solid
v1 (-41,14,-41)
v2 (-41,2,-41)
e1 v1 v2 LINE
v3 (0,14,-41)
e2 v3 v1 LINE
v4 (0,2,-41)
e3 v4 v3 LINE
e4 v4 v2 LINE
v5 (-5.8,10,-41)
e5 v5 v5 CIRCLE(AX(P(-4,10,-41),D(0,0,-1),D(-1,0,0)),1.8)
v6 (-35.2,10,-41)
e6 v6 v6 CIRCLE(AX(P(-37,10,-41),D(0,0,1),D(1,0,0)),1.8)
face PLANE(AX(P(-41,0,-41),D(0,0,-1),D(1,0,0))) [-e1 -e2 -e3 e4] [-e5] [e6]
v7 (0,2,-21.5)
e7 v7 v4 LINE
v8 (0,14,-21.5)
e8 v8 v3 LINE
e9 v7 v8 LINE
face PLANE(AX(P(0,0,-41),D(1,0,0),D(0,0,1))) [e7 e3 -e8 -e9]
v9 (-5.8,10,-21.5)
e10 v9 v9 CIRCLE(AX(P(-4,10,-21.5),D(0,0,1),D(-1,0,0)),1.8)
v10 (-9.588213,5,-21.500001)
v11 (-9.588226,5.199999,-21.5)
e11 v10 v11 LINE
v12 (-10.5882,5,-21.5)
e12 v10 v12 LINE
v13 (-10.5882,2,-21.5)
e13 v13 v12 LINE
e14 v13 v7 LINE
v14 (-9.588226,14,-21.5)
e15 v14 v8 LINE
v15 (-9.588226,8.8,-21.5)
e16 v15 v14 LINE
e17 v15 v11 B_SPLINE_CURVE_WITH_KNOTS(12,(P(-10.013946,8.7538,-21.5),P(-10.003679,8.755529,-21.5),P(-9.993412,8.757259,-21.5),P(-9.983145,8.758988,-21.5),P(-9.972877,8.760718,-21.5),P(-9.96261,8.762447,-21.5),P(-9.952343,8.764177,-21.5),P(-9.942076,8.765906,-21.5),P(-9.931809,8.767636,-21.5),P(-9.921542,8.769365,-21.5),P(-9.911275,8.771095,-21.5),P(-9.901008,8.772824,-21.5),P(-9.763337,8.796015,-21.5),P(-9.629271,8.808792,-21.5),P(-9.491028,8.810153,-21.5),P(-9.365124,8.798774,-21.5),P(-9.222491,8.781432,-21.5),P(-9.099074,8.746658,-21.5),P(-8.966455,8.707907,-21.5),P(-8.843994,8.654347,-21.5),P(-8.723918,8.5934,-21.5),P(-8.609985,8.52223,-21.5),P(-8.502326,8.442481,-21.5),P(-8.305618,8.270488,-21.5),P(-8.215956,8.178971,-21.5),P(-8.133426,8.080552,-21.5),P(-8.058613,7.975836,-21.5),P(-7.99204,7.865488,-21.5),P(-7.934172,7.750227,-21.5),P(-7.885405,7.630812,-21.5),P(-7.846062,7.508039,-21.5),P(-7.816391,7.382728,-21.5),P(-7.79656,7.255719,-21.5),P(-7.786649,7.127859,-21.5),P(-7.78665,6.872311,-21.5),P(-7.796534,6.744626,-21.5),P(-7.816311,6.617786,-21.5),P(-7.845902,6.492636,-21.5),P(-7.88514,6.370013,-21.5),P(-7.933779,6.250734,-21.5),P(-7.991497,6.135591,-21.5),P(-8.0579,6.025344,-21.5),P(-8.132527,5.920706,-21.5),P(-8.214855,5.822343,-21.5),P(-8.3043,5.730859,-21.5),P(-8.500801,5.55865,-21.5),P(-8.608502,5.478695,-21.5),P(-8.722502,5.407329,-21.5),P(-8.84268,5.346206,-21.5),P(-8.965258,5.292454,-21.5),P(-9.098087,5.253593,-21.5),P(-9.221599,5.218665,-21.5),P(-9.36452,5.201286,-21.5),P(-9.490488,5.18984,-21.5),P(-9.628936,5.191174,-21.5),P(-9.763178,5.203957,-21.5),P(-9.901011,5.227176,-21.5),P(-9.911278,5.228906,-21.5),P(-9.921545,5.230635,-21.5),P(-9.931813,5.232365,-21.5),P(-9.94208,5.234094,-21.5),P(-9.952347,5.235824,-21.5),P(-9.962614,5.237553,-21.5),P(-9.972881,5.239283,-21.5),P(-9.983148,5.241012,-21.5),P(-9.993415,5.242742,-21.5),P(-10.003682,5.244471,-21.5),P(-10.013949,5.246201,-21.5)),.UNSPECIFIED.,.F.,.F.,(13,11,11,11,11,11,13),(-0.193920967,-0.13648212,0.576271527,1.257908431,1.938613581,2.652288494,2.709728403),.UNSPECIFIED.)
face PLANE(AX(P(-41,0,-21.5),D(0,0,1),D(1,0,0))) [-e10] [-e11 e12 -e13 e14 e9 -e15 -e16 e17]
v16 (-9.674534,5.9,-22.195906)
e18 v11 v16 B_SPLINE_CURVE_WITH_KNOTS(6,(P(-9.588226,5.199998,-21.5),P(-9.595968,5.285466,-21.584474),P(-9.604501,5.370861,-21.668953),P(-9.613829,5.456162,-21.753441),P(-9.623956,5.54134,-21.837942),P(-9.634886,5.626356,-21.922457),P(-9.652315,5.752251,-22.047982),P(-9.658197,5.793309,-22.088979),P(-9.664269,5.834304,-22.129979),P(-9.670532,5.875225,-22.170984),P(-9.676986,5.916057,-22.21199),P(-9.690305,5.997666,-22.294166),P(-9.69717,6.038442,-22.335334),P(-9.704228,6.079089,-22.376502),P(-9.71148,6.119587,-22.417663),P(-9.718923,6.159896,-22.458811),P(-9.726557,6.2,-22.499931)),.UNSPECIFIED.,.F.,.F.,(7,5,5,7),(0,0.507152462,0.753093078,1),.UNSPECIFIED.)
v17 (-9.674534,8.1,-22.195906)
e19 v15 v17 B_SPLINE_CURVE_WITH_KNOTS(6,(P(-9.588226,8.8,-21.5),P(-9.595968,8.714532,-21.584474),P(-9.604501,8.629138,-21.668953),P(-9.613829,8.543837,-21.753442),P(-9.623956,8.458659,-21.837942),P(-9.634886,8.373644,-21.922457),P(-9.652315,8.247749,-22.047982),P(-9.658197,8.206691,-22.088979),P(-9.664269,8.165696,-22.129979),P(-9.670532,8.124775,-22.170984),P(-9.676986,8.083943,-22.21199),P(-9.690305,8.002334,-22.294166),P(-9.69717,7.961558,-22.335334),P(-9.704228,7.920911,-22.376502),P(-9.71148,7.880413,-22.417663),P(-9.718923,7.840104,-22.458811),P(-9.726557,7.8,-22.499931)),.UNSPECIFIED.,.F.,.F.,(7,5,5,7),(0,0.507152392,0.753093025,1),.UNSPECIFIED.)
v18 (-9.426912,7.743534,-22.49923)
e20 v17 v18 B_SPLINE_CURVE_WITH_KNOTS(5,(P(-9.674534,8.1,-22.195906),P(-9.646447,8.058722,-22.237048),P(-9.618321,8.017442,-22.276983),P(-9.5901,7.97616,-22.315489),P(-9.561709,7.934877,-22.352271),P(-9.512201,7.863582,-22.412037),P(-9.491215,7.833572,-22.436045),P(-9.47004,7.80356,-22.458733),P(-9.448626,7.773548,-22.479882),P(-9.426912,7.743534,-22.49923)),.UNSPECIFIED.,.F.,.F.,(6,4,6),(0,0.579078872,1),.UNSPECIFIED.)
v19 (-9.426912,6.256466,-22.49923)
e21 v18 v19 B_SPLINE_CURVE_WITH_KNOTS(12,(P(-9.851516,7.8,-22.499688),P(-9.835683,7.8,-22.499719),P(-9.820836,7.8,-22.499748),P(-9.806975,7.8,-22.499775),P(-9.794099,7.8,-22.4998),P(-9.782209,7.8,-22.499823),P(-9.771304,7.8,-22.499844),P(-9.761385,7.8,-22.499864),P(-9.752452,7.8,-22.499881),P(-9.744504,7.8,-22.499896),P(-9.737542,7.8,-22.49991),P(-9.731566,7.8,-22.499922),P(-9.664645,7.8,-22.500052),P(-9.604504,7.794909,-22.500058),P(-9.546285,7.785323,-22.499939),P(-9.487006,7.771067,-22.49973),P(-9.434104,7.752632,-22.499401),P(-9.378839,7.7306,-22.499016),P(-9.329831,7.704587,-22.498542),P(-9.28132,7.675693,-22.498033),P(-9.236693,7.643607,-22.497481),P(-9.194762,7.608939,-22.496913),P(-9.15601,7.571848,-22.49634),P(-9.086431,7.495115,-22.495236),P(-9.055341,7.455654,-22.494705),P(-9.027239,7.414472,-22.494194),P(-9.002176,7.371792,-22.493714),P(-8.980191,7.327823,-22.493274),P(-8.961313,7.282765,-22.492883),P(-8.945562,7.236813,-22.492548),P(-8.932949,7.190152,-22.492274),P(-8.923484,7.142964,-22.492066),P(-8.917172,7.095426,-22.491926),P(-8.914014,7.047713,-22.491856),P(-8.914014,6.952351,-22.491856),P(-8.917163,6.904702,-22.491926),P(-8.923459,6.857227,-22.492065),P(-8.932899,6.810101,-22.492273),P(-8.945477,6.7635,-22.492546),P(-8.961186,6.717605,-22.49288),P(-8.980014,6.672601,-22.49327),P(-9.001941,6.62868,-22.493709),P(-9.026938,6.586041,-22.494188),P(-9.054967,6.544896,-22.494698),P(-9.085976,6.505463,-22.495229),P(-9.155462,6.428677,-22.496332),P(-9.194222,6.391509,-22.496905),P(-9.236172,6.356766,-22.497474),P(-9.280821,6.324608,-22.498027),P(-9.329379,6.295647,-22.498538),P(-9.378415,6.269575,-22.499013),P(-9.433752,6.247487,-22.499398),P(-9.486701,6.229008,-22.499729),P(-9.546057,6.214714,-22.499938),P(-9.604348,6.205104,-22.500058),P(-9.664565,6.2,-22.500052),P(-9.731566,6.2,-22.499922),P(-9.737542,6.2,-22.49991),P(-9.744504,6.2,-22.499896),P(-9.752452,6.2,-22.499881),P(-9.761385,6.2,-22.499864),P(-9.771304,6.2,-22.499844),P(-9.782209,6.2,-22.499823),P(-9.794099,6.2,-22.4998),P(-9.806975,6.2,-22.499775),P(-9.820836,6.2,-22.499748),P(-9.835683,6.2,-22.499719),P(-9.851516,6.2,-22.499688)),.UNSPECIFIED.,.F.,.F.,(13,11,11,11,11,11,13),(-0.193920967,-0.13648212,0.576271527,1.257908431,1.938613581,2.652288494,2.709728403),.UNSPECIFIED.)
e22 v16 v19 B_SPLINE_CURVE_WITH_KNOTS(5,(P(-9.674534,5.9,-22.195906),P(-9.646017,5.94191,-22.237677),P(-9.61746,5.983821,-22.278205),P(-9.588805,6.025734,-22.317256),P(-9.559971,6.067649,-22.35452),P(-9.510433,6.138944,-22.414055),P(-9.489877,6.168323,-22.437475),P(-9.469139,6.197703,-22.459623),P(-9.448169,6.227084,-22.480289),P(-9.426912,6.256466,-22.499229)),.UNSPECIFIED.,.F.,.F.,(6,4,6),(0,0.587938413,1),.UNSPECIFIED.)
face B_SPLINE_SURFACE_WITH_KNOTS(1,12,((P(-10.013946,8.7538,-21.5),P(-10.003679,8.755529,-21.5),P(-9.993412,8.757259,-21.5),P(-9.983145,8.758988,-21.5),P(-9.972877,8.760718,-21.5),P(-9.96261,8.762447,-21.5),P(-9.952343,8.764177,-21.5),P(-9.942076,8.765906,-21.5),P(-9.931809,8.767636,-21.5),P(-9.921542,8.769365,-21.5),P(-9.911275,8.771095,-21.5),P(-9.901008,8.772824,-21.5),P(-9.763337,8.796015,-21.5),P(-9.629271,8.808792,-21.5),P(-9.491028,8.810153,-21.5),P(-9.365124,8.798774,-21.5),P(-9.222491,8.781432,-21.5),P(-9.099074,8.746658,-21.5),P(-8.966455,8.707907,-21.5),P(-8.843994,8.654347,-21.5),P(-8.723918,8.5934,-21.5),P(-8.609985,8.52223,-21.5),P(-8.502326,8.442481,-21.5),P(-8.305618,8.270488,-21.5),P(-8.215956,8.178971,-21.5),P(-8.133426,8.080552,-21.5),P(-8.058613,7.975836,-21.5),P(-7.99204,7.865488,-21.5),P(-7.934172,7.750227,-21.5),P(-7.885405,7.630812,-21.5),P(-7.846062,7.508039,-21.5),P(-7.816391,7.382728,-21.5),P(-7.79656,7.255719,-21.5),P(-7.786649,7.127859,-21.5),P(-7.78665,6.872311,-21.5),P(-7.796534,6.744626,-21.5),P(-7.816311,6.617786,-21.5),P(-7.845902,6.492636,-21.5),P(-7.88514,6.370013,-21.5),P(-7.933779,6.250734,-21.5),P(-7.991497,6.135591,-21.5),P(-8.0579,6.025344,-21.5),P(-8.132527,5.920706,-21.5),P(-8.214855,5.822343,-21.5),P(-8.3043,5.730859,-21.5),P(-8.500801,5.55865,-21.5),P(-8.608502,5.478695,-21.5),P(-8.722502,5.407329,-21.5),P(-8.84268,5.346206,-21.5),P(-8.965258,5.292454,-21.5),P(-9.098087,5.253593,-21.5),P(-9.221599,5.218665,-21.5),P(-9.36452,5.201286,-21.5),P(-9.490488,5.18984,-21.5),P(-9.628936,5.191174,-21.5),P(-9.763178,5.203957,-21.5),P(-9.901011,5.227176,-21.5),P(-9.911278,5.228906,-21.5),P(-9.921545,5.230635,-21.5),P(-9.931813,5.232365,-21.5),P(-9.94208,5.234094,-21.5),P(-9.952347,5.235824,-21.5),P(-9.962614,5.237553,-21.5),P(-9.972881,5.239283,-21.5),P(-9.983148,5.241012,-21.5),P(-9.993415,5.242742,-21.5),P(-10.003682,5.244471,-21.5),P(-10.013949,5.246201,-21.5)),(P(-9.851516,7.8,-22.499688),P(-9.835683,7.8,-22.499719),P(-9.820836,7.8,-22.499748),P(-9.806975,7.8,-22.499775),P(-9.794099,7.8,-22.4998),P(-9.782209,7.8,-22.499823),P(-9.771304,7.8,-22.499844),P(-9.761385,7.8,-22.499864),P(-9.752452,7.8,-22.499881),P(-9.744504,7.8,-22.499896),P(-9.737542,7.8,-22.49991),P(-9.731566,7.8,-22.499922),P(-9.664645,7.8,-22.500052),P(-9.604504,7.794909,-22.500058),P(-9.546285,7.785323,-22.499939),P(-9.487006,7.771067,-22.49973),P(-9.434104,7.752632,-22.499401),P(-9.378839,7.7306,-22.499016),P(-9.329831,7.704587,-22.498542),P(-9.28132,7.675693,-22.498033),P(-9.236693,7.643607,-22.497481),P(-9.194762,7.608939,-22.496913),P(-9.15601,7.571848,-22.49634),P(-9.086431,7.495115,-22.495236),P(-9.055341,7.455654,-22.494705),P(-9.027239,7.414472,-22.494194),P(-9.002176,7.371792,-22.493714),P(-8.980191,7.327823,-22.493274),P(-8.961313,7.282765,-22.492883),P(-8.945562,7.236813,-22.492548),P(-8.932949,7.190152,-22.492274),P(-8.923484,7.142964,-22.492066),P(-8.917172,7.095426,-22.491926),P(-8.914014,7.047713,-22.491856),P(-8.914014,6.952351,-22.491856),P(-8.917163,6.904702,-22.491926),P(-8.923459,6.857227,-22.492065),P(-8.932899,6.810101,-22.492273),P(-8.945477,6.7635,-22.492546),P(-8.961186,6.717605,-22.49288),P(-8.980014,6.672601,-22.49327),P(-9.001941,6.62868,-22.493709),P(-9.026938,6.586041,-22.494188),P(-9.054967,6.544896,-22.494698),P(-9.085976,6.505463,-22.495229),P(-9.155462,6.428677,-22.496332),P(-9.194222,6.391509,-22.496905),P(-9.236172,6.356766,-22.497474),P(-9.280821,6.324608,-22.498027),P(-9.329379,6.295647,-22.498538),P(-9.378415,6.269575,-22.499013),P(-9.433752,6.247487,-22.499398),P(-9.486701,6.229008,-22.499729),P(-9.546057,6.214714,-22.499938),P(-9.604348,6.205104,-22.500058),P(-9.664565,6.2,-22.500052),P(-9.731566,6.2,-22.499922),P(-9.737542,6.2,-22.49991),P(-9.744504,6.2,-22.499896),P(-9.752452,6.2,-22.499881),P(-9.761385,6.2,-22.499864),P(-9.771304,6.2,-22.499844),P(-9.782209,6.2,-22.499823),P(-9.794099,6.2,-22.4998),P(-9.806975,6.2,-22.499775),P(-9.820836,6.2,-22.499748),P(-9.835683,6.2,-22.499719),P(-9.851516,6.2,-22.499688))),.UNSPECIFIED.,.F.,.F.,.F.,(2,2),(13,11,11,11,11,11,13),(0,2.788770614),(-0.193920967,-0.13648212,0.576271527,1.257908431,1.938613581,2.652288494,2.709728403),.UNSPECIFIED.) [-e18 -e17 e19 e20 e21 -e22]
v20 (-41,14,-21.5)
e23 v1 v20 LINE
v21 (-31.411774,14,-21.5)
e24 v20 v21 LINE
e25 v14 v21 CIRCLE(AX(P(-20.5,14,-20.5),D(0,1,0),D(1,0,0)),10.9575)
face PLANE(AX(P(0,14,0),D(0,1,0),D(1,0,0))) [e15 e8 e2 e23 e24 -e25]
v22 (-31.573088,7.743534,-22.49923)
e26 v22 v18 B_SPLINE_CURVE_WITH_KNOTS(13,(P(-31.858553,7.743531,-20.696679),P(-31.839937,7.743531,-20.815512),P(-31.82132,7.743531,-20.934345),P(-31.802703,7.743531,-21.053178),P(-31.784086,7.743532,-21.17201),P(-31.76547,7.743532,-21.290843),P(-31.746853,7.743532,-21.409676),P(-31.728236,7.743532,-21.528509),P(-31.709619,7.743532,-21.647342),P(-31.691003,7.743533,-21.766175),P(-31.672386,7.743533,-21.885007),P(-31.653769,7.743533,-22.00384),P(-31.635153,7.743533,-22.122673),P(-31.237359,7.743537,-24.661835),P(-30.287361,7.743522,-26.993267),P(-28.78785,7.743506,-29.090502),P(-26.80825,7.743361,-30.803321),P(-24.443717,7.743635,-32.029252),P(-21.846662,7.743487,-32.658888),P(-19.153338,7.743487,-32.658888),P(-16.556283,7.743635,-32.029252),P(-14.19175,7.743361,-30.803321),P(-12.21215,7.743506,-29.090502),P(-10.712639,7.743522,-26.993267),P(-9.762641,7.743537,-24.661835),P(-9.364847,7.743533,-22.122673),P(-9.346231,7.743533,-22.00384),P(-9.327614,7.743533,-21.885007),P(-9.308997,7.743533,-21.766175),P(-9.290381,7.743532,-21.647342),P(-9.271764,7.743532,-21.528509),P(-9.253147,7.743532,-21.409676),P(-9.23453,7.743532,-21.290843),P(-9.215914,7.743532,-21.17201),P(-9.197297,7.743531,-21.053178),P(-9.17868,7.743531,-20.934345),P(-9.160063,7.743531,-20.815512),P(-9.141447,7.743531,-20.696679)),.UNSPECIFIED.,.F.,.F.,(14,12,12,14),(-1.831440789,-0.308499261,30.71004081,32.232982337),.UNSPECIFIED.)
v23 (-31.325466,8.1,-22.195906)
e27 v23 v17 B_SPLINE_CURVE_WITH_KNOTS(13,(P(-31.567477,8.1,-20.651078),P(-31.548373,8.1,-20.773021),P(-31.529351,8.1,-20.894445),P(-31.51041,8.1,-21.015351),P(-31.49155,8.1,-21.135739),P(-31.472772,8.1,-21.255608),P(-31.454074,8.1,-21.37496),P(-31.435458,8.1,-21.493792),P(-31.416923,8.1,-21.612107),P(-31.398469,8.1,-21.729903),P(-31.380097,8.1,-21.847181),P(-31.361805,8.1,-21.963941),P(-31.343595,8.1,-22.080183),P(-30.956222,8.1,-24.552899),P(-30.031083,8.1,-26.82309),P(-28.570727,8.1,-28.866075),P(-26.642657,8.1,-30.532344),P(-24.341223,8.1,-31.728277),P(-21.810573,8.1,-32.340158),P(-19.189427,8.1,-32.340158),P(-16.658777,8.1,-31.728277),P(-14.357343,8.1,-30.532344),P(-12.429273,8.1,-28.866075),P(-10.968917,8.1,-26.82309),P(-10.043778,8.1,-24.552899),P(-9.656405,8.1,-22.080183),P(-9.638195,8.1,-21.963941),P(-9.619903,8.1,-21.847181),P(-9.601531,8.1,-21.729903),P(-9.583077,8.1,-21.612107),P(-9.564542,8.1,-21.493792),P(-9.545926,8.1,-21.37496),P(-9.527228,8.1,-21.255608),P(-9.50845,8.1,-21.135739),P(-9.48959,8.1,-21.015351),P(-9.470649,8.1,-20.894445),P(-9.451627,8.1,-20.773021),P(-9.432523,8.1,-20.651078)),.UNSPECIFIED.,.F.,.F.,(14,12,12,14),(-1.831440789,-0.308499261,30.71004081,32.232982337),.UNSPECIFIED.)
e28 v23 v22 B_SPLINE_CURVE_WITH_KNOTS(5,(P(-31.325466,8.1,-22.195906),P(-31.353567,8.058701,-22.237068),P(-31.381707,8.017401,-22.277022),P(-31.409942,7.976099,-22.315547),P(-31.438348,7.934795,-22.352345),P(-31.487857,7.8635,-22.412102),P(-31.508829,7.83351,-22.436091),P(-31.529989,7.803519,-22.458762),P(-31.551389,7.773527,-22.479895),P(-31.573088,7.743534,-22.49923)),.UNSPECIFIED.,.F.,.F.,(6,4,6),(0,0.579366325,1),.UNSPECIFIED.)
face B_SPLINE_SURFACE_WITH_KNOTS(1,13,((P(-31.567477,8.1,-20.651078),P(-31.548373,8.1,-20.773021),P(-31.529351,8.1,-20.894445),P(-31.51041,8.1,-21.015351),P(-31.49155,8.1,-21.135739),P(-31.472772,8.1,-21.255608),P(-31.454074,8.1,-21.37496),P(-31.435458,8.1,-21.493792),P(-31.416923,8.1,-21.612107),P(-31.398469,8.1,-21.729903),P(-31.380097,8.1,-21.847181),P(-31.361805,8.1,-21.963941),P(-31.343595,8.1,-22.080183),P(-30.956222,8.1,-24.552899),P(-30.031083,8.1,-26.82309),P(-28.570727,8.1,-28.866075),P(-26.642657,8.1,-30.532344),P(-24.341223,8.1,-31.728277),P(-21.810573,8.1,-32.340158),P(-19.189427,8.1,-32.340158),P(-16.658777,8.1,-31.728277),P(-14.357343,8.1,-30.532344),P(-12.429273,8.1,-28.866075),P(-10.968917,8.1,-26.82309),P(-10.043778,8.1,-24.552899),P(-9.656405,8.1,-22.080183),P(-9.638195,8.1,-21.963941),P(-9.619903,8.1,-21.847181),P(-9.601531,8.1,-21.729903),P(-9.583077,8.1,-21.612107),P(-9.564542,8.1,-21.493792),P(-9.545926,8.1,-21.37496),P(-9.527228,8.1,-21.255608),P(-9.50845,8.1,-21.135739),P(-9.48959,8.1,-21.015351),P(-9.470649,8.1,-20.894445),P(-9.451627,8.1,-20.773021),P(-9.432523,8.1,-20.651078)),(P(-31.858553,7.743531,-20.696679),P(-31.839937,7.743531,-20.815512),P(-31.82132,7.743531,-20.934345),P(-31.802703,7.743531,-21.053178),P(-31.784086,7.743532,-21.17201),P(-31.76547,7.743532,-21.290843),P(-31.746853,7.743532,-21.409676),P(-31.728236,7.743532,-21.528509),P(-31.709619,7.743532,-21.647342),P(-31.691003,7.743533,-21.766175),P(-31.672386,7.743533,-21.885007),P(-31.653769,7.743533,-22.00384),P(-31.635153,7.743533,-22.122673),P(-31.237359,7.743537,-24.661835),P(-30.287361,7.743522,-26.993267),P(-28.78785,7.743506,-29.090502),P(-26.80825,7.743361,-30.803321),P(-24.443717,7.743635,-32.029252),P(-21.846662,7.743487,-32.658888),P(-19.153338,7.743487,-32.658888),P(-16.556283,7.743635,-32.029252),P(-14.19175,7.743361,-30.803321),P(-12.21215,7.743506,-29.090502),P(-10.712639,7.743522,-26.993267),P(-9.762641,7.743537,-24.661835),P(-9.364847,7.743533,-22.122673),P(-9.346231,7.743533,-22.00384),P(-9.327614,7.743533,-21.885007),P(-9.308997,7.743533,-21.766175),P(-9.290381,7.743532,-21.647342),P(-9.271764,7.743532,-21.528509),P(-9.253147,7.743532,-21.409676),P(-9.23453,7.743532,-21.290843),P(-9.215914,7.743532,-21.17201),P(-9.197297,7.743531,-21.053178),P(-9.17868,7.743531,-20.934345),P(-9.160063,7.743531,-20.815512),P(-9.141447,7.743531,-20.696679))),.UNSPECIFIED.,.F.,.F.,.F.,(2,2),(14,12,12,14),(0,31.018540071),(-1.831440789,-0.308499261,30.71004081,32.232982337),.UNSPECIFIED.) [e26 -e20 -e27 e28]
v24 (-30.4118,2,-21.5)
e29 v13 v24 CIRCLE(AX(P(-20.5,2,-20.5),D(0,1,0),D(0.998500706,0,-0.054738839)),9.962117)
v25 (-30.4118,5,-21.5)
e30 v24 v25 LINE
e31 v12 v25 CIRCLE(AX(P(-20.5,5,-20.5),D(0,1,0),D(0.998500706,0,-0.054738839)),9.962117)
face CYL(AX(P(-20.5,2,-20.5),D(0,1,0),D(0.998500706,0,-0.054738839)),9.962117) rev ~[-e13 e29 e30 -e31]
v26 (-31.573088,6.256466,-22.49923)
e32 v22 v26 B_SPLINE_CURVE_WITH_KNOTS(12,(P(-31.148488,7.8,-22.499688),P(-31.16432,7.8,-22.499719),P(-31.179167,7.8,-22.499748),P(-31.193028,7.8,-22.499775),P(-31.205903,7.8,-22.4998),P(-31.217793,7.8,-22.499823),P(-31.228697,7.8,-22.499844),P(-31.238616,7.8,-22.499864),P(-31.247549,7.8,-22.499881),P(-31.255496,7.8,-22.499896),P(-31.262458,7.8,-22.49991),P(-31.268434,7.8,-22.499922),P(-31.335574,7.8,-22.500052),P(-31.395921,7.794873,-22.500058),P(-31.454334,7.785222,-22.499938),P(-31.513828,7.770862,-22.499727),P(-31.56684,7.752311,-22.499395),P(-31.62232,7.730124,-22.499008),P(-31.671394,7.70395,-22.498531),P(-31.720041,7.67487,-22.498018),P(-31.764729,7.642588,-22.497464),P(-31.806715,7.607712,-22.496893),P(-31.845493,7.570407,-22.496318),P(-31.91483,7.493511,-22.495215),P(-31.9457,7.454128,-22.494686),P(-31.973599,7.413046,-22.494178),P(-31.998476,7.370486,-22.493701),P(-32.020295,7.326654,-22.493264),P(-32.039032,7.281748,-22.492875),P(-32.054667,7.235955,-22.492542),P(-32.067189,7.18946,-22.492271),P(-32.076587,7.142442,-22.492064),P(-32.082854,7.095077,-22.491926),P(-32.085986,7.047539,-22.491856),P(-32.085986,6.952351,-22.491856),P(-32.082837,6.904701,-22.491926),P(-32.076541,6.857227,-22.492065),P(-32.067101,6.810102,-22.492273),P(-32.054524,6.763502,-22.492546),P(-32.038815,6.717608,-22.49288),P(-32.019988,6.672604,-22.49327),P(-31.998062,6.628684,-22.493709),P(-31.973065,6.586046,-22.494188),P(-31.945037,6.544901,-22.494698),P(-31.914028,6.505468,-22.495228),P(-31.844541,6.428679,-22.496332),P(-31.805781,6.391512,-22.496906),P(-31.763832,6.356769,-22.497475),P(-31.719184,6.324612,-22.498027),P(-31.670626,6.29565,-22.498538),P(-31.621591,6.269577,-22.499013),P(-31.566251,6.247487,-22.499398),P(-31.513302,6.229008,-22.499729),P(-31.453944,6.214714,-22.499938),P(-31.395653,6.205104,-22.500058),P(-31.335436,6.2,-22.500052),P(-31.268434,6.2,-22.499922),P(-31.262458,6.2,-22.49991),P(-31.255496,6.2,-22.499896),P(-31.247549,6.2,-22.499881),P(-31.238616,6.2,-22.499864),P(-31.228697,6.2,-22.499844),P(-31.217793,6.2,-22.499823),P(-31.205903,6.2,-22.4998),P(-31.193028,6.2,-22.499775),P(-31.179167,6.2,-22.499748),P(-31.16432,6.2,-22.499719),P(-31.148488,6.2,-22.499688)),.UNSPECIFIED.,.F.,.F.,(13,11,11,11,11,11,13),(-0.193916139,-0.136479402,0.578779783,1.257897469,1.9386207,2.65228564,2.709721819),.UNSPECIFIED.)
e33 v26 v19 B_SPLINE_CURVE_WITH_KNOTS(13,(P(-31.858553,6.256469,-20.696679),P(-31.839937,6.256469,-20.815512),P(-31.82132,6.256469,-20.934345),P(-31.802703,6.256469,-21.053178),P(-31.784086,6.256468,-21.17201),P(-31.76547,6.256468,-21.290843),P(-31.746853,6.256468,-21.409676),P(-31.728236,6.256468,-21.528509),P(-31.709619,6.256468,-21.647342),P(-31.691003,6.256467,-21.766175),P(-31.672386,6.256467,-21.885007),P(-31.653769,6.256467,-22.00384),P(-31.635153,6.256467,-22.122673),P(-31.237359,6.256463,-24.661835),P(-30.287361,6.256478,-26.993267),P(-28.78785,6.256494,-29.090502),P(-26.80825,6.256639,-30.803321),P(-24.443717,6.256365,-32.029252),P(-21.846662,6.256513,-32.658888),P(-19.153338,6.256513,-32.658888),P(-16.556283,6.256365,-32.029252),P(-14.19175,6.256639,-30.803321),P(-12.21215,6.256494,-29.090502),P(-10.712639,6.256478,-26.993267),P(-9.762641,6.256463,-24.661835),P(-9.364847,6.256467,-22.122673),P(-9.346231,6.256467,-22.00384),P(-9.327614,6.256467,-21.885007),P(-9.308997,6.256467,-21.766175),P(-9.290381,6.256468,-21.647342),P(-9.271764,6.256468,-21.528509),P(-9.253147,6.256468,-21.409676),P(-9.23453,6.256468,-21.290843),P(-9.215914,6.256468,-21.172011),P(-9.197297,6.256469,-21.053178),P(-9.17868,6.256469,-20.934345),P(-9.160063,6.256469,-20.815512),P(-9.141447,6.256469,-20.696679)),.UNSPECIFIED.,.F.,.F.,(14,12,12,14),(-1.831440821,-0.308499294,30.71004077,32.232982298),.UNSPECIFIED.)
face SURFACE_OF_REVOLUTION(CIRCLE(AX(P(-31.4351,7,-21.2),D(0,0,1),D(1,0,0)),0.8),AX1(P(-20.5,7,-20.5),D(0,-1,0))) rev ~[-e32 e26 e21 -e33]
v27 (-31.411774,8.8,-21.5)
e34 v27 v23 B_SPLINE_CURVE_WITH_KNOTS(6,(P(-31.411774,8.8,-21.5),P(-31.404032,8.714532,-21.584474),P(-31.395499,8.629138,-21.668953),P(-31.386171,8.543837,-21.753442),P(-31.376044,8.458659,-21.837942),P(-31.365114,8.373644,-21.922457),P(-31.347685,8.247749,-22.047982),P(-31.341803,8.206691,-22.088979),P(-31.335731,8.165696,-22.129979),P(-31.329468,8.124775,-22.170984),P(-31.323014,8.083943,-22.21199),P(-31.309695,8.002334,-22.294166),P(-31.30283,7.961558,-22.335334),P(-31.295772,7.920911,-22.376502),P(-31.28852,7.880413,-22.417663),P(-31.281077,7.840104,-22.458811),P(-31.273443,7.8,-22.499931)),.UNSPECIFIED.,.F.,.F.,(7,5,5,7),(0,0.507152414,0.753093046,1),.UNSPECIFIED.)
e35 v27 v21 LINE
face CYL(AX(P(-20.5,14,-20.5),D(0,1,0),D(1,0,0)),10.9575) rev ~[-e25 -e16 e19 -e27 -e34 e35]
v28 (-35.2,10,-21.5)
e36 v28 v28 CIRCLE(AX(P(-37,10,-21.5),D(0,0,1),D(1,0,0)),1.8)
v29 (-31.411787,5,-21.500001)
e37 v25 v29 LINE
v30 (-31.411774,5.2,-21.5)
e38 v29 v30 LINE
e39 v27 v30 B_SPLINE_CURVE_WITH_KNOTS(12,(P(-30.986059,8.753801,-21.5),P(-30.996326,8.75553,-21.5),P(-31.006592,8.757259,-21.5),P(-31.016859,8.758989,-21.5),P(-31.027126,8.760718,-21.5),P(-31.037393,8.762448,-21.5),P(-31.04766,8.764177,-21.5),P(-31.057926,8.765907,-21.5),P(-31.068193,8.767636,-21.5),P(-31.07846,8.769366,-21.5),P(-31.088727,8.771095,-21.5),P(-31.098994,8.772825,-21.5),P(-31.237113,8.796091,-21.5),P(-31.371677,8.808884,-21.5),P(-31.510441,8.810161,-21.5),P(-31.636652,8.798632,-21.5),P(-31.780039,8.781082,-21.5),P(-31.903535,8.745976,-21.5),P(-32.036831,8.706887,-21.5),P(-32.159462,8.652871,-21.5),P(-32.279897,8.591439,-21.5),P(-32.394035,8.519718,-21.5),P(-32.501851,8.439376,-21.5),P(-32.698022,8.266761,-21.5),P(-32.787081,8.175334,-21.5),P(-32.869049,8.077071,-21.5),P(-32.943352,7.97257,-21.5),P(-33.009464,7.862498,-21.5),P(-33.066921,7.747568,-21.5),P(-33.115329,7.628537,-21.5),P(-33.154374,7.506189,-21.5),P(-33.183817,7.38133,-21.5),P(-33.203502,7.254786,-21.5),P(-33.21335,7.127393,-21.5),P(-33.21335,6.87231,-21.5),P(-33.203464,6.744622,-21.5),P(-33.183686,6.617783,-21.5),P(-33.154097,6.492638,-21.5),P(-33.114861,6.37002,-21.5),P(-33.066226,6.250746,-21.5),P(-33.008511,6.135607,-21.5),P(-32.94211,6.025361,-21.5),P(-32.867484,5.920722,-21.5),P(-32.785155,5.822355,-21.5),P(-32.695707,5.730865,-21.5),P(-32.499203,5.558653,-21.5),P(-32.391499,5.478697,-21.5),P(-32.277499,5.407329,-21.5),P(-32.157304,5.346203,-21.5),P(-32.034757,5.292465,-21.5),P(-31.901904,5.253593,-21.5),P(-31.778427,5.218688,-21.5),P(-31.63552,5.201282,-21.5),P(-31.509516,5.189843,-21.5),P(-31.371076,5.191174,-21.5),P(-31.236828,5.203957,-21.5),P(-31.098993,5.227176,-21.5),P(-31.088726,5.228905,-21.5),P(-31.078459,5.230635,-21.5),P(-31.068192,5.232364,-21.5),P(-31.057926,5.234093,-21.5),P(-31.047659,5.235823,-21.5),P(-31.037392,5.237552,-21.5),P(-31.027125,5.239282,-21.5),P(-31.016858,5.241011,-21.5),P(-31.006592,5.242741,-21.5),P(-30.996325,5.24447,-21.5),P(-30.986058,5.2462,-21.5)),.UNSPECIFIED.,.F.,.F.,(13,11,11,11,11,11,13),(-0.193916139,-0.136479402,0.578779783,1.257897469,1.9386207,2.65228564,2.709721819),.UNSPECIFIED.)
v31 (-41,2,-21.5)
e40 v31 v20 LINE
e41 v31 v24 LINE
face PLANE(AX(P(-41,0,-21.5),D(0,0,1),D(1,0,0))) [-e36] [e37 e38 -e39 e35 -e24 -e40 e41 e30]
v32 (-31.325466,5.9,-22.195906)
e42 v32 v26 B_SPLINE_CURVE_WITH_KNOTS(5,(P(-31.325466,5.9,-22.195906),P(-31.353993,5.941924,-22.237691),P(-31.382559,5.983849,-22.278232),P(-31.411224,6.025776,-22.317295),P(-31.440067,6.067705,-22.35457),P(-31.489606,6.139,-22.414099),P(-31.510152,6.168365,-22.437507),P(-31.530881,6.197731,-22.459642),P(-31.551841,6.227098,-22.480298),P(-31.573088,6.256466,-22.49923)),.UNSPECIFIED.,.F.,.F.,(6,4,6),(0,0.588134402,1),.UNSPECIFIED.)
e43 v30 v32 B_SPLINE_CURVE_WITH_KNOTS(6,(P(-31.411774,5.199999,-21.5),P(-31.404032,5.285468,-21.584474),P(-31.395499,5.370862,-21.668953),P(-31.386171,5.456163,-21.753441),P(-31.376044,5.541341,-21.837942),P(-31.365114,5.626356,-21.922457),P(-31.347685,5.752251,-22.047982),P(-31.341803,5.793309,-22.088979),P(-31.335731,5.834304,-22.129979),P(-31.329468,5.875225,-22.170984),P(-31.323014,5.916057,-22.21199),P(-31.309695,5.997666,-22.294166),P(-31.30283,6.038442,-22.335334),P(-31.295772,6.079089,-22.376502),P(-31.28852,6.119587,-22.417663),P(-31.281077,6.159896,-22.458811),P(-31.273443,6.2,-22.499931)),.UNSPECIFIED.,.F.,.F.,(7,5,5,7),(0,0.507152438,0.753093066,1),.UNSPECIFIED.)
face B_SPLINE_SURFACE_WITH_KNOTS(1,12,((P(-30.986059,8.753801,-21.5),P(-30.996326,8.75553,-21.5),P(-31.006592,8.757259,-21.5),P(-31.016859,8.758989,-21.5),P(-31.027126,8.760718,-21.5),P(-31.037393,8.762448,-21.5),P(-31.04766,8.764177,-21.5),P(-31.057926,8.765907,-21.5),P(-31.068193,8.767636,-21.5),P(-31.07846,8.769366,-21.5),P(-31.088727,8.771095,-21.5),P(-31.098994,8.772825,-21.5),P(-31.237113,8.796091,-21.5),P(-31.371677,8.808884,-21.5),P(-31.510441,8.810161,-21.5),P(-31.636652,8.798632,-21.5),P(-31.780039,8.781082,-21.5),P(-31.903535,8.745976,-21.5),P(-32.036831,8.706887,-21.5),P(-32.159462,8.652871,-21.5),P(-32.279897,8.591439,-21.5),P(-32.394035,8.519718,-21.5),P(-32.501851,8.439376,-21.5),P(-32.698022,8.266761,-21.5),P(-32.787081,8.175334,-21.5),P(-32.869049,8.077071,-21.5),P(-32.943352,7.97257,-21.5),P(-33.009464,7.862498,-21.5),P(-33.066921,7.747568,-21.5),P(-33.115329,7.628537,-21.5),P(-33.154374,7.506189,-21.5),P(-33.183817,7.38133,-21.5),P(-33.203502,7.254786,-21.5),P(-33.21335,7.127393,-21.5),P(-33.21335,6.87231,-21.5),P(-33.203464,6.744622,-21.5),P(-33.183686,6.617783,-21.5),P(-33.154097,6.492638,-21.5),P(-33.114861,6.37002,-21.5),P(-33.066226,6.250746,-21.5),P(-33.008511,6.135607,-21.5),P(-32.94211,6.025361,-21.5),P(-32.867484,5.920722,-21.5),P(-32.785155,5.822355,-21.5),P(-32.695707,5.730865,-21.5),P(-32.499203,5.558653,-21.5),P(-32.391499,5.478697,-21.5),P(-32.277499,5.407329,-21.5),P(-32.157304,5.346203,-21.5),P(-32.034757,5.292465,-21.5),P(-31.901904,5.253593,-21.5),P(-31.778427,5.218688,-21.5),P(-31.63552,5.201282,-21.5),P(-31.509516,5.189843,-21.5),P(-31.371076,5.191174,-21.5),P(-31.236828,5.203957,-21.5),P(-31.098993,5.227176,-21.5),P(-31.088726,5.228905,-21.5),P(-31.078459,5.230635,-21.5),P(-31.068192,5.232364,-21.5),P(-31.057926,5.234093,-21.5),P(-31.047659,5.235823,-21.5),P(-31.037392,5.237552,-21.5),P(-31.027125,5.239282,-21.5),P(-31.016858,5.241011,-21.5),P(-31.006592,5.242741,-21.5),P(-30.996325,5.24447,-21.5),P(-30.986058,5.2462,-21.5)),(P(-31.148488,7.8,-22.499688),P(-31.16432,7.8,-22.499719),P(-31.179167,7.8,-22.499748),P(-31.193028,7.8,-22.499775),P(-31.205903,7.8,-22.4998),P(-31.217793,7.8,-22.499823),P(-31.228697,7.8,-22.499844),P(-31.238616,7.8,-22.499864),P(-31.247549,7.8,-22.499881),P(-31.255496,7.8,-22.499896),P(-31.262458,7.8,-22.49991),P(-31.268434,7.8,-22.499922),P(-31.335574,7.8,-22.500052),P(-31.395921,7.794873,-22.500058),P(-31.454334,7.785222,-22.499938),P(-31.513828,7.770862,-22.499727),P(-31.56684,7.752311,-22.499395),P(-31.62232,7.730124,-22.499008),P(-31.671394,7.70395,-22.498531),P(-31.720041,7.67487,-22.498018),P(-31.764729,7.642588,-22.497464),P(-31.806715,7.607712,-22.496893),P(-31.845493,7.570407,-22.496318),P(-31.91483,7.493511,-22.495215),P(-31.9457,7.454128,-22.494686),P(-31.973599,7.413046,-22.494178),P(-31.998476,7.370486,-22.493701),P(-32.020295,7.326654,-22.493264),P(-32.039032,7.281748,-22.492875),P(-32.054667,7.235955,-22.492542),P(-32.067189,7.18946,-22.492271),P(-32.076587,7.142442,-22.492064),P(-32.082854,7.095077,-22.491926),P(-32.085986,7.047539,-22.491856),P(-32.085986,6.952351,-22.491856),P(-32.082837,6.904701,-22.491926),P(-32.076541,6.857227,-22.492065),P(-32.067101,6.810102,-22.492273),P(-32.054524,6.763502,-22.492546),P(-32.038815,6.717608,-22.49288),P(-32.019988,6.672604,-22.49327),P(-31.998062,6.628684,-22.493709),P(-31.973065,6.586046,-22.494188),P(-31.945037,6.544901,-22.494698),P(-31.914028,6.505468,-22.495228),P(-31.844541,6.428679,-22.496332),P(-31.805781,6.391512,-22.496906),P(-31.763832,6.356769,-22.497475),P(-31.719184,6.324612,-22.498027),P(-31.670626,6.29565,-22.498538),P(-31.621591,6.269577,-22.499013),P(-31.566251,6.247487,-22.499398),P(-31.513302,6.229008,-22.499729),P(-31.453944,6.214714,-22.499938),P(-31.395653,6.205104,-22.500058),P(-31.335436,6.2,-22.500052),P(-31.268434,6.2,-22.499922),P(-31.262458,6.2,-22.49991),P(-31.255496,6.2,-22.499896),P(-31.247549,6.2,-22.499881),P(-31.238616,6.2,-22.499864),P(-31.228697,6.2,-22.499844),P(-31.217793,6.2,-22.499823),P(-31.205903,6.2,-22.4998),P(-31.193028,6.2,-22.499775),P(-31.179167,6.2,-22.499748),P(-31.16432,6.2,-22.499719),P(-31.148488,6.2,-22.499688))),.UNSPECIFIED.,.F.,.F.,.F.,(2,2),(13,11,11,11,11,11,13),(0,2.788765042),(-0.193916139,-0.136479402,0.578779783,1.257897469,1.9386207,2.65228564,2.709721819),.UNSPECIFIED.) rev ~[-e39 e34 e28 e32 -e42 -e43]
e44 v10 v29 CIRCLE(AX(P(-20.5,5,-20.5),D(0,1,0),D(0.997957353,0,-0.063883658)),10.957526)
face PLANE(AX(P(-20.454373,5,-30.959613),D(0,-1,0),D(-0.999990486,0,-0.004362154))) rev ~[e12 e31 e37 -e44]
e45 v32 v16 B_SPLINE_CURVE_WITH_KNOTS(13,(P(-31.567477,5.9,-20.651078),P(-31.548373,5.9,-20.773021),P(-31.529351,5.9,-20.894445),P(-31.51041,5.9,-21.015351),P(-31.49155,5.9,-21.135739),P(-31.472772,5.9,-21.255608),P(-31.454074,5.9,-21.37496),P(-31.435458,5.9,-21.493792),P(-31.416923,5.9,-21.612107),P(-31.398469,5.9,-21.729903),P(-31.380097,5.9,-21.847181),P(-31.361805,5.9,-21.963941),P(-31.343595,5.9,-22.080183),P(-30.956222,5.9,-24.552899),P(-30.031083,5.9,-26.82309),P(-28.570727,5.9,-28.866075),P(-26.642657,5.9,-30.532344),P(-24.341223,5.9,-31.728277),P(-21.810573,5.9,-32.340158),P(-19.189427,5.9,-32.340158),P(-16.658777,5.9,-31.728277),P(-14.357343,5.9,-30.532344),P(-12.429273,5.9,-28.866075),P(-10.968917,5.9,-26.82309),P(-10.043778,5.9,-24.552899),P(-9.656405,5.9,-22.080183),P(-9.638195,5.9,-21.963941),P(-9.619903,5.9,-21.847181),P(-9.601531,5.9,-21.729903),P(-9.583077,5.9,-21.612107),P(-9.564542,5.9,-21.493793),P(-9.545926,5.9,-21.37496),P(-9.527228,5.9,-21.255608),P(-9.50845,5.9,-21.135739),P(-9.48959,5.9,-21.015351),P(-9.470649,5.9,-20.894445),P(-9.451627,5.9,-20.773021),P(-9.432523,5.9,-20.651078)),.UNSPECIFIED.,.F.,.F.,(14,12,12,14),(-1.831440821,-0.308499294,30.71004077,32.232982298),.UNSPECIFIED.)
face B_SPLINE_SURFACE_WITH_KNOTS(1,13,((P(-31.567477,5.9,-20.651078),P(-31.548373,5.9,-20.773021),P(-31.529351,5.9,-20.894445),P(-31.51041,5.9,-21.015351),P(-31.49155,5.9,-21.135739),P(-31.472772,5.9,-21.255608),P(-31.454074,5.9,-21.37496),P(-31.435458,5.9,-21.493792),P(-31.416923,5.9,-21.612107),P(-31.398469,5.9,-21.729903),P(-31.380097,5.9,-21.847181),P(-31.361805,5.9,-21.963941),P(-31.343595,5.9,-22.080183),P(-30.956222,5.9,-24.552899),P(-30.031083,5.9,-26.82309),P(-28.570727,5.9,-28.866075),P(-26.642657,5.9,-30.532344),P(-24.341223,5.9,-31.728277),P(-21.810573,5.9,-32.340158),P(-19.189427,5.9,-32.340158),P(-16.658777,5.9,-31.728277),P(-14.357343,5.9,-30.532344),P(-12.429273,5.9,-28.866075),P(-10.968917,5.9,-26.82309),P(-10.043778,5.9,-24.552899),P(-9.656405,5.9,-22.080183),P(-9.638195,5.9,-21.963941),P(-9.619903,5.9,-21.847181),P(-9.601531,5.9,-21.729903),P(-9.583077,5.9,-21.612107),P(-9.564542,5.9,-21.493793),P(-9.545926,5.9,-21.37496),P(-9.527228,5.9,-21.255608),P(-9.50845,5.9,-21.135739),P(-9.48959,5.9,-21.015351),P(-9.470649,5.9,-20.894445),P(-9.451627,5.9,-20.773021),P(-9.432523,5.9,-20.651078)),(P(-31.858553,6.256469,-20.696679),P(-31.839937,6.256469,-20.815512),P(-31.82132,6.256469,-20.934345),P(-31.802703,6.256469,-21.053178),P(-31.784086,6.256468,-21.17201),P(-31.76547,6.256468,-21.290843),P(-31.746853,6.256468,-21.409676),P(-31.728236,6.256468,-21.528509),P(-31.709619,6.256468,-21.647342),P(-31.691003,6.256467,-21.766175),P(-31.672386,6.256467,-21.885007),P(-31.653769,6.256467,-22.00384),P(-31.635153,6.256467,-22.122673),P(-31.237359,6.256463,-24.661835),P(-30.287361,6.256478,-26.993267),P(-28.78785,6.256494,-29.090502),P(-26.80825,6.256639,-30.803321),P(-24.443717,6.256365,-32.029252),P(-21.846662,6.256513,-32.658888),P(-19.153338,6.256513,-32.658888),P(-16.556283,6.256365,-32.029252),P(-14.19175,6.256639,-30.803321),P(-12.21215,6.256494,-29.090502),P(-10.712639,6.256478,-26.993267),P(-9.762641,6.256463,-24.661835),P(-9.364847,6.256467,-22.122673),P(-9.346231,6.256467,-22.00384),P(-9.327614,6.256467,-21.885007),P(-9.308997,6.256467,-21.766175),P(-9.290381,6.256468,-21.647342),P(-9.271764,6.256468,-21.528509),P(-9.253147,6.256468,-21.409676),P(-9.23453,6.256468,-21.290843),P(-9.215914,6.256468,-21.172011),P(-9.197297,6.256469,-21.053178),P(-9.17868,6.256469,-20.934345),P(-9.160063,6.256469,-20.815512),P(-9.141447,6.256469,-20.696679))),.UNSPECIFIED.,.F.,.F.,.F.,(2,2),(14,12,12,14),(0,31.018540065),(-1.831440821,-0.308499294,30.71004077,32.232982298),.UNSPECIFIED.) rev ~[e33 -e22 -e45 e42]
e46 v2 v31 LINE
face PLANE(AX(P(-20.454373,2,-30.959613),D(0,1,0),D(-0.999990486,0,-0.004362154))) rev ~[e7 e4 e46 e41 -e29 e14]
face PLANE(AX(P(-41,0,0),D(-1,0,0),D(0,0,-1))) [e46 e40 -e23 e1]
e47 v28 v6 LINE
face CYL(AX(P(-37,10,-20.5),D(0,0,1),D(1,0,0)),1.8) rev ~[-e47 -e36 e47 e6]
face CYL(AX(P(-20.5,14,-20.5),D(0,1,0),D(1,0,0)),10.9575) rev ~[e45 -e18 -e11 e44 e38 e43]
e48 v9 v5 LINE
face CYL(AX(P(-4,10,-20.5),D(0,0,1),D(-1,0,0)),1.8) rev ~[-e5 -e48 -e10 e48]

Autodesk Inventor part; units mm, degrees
ref_plane "YZ Plane" through (0, 0, 0) normal (1, 0, 0) x (0, 1, 0)
ref_plane "XZ Plane" through (0, 0, 0) normal (0, 1, 0) x (-1, 0, 0)
sketch "Sketch1" plane through (0, 0, 0) normal (0, 1, 0) x (-1, 0, 0)
  line L0 (0, 0) -> (41, 0)
  line L1 (41, 0) -> (41, -41)
  line L2 (41, -41) -> (0, -41)
  line L3 (0, -41) -> (0, 0)
  dimension "d0" = 41
  dimension "d1" = 41
extrude "Extrusion1" add sketch "Sketch1" along normal blind 9.5
sketch "Sketch3" plane through (0, 9.5, 0) normal (0, 1, 0) x (1, 0, 0)
  circle A0 centre (-20.5, 20.5) radius 10
  point P0 (0, 0)
  dimension "d5" = 20
extrude "Extrusion2" cut sketch "Sketch3" against normal blind 10
sketch "Sketch4" plane through (0, 9.5, 0) normal (0, 1, 0) x (1, 0, 0)
  circle A0 centre (-20.5, 20.5) radius 10 projected
  circle A1 centre (-20.5, 20.5) radius 11.75
  point P0 (0, 0)
  dimension "d8" = 23.5
extrude "Extrusion3" cut sketch "Sketch4" against normal blind 5
sketch "Sketch5" plane through (0, 9.5, 0) normal (0, 1, 0) x (1, 0, 0)
  line L0 (-41, 41) -> (-41, 0) projected
  line L1 (-41, 0) -> (0, 0)
  line L2 (0, 0) -> (0, 41)
  line L3 (0, 41) -> (-41, 41)
  line L4 (-41, 41) -> (-41, 0)
  circle A0 centre (-20.5, 20.5) radius 11.75 projected
  circle A1 centre (-20.5, 20.5) radius 10
extrude "Extrusion4" add sketch "Sketch5" along normal blind 4.5 contours L3 L2 L1 L0 | A0
sketch "Sketch6" plane through (-41, 0, 0) normal (0, 0, 1) x (1, 0, 0)
  line L0 (0, 0) -> (0, 14) projected
  line L1 (0, 14) -> (41, 14)
  line L2 (41, 14) -> (41, 0)
  line L3 (41, 0) -> (0, 0)
  line L4 (0, 0) -> (0, 14)
extrude "Extrusion5" cut sketch "Sketch6" against normal blind 20.5
sketch "Sketch8" plane through (-41, 0, -20.5) normal (0, 0, 1) x (1, 0, 0)
  circle A0 centre (4, 10) radius 1.8
  point P0 (41, 0)
  dimension "d15" = 3.6
extrude "Extrusion6" cut sketch "Sketch8" against normal blind 20.5
ref_plane "Work Plane1" through (-20.5, 0, -41) normal (1, 0, 0) x (0, 0, -1)
mirror "Mirror1" about plane through (-20.5, 0, -41) normal (1, 0, 0) of "Extrusion6"
sketch "Sketch9" plane through (-41, 0, -20.5) normal (0, 0, 1) x (1, 0, 0)
  line L0 (10.5, 14) -> (10.5, 9.5) projected
  line L1 (8.75, 4.5) -> (10.5, 4.5) projected
  line L2 (10.5, 9.5) -> (8.75, 9.5)
  line L3 (8.75, 9.5) -> (8.75, 4.5)
  line L4 (8.75, 4.5) -> (10.5, 4.5)
  line L5 (10.5, 4.5) -> (10.5, 9.5)
  point P0 (41, 0)
sketch "Sketch11" plane through (0, 4.5, 0) normal (0, 1, 0) x (1, 0, 0)
  arc A0 (-10.5, 20.5) -> (-30.5, 20.5) centre (-20.5, 20.5) ccw projected
  arc A1 (-9.625, 20.5) -> (-31.375, 20.5) centre (-20.5, 20.5) ccw
  line L0 (-41, 41) -> (-41, 20.5) projected
  point P0 (0, 0)
sweep "Sweep1" add profiles "Sketch9" path "Sketch11" path curves A1
sketch "Sketch12" plane through (-41, 0, -20.5) normal (0, 0, 1) x (1, 0, 0)
  line L0 (10.5, 14) -> (10.5, 0) projected
  circle A0 centre (10.5, 7) radius 0.8
  point P0 (41, 0)
  dimension "d21" = 1.6
sketch3d "3D Sketch1"
  arc A0 (-30.5, 14, -20.5) -> (-27.5711, 14, -27.5711) centre (-20.5, 14, -20.5) ccw
  arc A1 (-27.5711, 14, -27.5711) -> (-20.5, 14, -30.5) centre (-20.5, 14, -20.5) ccw
  arc A2 (-20.5, 14, -30.5) -> (-13.4289, 14, -27.5711) centre (-20.5, 14, -20.5) ccw
  arc A3 (-13.4289, 14, -27.5711) -> (-10.5, 14, -20.5) centre (-20.5, 14, -20.5) ccw
sweep "Sweep2" cut profiles "Sketch12" path "3D Sketch1"
sketch "Sketch13" plane through (0, 0, 0) normal (0, -1, 0) x (1, 0, 0)
  line L0 (-53.975, -9.525) -> (46.0375, -9.525)
  line L1 (46.0375, -9.525) -> (46.0375, -71.4375)
  line L2 (46.0375, -71.4375) -> (-53.975, -71.4375)
  line L3 (-53.975, -71.4375) -> (-53.975, -9.525)
  point P0 (0, 0)
extrude "Extrusion7" cut sketch "Sketch13" against normal blind 2
sketch "Sketch14" plane through (-41, 0, -20.5) normal (0, 0, 1) x (1, 0, 0)
  line L0 (-1.5875, 15.875) -> (46.0375, 15.875)
  line L1 (46.0375, 15.875) -> (46.0375, -1.5875)
  line L2 (46.0375, -1.5875) -> (-1.5875, -1.5875)
  line L3 (-1.5875, -1.5875) -> (-1.5875, 15.875)
  point P0 (41, 0)
extrude "Extrusion8" cut sketch "Sketch14" against normal blind 0.7
sketch "Sketch15" plane through (0, 14, 0) normal (0, 1, 0) x (1, 0, 0)
  arc A0 (-10.5245, 21.2) -> (-30.4755, 21.2) centre (-20.5, 20.5) ccw projected
  circle A1 centre (-20.5, 20.5) radius 10.9575
  point P0 (0, 0)
  dimension "d28" = 21.915
extrude "Extrusion9" cut sketch "Sketch15" against normal blind 15
sketch "Sketch16" plane through (-41, 0, -21.2) normal (0, 0, 1) x (1, 0, 0)
  line L0 (9.5649, 2) -> (9.5649, 14) projected
  circle A0 centre (9.5649, 7) radius 0.8
  point P0 (41, 0)
  dimension "d31" = 1.6
sketch "Sketch17" plane through (0, 14, 0) normal (0, 1, 0) x (1, 0, 0)
  arc A0 (-9.5649, 21.2) -> (-31.4351, 21.2) centre (-20.5, 20.5) ccw projected
  arc A1 (-7.5073, 21.2) -> (-33.4927, 21.2) centre (-20.5, 20.5) ccw
  point P0 (0, 0)
sketch3d "3D Sketch2"
  arc A0 (-31.4351, 14, -21.2) -> (-9.5649, 14, -21.2) centre (-20.5, 14, -20.5) ccw
sweep "Sweep3" cut profiles "Sketch16" path "3D Sketch2"
sketch "Sketch18" plane through (-41, 0, -21.2) normal (0, 0, 1) x (1, 0, 0)
  line L0 (31.4351, 7.8) -> (31.4351, 6.2) projected
  circle A0 centre (31.4351, 7) radius 0.8
  point P0 (41, 0)
sketch3d "3D Sketch3"
  arc A0 (-9.5649, 14, -21.2) -> (-31.4351, 14, -21.2) centre (-20.5, 14, -20.5) ccw
sweep "Sweep4" cut profiles "Sketch18" path "3D Sketch3"
sketch "Sketch19" plane through (-41, 0, -21.2) normal (0, 0, 1) x (1, 0, 0)
  line L0 (0, 2) -> (0, 14) projected
  line L1 (41, 2) -> (41, 14) projected
  line L2 (0, 14) -> (41, 14)
  line L3 (41, 14) -> (41, 2)
  line L4 (41, 2) -> (0, 2)
  line L5 (0, 2) -> (0, 14)
  point P0 (41, 0)
extrude "Extrusion10" cut sketch "Sketch19" against normal blind 0.3
sketch "Sketch20" plane through (-41, 0, -21.5) normal (0, 0, 1) x (1, 0, 0)
  line L0 (9.5882, 6.2) -> (9.5882, 2) projected
  line L1 (9.5882, 2) -> (10.5882, 2)
  line L2 (10.5882, 2) -> (10.5882, 5)
  line L3 (10.5882, 5) -> (9.5882, 5)
  line L4 (9.5882, 5) -> (9.5882, 2)
  point P0 (41, 0)
  dimension "d38" = 1
  dimension "d39" = 3
sweep "Sweep5" add profiles "Sketch20" path "Sketch17" path curves A0
sketch "Sketch21" plane through (-41, 0, -21.5) normal (0, 0, 1) x (1, 0, 0)
  line L0 (0, 2) -> (0, 14) projected
  line L1 (41, 2) -> (0, 2) projected
  line L2 (0, 14) -> (41, 14)
  line L3 (41, 14) -> (41, 2)
  line L4 (41, 2) -> (0, 2)
  line L5 (0, 2) -> (0, 14)
  point P0 (41, 0)
extrude "Extrusion11" cut sketch "Sketch21" along normal blind 10
chamfer "Chamfer1" distance 1 angle 45 2 edges at (-8.7866, 7, -21.5) (-32.2134, 7, -21.5)
chamfer "Chamfer2" distance 0.3 angle 45 2 edges at (-20.4996, 7.8, -31.4575) (-20.4997, 6.2, -31.4575)
properties part number "7 peristaltic pump lid with lip2"
